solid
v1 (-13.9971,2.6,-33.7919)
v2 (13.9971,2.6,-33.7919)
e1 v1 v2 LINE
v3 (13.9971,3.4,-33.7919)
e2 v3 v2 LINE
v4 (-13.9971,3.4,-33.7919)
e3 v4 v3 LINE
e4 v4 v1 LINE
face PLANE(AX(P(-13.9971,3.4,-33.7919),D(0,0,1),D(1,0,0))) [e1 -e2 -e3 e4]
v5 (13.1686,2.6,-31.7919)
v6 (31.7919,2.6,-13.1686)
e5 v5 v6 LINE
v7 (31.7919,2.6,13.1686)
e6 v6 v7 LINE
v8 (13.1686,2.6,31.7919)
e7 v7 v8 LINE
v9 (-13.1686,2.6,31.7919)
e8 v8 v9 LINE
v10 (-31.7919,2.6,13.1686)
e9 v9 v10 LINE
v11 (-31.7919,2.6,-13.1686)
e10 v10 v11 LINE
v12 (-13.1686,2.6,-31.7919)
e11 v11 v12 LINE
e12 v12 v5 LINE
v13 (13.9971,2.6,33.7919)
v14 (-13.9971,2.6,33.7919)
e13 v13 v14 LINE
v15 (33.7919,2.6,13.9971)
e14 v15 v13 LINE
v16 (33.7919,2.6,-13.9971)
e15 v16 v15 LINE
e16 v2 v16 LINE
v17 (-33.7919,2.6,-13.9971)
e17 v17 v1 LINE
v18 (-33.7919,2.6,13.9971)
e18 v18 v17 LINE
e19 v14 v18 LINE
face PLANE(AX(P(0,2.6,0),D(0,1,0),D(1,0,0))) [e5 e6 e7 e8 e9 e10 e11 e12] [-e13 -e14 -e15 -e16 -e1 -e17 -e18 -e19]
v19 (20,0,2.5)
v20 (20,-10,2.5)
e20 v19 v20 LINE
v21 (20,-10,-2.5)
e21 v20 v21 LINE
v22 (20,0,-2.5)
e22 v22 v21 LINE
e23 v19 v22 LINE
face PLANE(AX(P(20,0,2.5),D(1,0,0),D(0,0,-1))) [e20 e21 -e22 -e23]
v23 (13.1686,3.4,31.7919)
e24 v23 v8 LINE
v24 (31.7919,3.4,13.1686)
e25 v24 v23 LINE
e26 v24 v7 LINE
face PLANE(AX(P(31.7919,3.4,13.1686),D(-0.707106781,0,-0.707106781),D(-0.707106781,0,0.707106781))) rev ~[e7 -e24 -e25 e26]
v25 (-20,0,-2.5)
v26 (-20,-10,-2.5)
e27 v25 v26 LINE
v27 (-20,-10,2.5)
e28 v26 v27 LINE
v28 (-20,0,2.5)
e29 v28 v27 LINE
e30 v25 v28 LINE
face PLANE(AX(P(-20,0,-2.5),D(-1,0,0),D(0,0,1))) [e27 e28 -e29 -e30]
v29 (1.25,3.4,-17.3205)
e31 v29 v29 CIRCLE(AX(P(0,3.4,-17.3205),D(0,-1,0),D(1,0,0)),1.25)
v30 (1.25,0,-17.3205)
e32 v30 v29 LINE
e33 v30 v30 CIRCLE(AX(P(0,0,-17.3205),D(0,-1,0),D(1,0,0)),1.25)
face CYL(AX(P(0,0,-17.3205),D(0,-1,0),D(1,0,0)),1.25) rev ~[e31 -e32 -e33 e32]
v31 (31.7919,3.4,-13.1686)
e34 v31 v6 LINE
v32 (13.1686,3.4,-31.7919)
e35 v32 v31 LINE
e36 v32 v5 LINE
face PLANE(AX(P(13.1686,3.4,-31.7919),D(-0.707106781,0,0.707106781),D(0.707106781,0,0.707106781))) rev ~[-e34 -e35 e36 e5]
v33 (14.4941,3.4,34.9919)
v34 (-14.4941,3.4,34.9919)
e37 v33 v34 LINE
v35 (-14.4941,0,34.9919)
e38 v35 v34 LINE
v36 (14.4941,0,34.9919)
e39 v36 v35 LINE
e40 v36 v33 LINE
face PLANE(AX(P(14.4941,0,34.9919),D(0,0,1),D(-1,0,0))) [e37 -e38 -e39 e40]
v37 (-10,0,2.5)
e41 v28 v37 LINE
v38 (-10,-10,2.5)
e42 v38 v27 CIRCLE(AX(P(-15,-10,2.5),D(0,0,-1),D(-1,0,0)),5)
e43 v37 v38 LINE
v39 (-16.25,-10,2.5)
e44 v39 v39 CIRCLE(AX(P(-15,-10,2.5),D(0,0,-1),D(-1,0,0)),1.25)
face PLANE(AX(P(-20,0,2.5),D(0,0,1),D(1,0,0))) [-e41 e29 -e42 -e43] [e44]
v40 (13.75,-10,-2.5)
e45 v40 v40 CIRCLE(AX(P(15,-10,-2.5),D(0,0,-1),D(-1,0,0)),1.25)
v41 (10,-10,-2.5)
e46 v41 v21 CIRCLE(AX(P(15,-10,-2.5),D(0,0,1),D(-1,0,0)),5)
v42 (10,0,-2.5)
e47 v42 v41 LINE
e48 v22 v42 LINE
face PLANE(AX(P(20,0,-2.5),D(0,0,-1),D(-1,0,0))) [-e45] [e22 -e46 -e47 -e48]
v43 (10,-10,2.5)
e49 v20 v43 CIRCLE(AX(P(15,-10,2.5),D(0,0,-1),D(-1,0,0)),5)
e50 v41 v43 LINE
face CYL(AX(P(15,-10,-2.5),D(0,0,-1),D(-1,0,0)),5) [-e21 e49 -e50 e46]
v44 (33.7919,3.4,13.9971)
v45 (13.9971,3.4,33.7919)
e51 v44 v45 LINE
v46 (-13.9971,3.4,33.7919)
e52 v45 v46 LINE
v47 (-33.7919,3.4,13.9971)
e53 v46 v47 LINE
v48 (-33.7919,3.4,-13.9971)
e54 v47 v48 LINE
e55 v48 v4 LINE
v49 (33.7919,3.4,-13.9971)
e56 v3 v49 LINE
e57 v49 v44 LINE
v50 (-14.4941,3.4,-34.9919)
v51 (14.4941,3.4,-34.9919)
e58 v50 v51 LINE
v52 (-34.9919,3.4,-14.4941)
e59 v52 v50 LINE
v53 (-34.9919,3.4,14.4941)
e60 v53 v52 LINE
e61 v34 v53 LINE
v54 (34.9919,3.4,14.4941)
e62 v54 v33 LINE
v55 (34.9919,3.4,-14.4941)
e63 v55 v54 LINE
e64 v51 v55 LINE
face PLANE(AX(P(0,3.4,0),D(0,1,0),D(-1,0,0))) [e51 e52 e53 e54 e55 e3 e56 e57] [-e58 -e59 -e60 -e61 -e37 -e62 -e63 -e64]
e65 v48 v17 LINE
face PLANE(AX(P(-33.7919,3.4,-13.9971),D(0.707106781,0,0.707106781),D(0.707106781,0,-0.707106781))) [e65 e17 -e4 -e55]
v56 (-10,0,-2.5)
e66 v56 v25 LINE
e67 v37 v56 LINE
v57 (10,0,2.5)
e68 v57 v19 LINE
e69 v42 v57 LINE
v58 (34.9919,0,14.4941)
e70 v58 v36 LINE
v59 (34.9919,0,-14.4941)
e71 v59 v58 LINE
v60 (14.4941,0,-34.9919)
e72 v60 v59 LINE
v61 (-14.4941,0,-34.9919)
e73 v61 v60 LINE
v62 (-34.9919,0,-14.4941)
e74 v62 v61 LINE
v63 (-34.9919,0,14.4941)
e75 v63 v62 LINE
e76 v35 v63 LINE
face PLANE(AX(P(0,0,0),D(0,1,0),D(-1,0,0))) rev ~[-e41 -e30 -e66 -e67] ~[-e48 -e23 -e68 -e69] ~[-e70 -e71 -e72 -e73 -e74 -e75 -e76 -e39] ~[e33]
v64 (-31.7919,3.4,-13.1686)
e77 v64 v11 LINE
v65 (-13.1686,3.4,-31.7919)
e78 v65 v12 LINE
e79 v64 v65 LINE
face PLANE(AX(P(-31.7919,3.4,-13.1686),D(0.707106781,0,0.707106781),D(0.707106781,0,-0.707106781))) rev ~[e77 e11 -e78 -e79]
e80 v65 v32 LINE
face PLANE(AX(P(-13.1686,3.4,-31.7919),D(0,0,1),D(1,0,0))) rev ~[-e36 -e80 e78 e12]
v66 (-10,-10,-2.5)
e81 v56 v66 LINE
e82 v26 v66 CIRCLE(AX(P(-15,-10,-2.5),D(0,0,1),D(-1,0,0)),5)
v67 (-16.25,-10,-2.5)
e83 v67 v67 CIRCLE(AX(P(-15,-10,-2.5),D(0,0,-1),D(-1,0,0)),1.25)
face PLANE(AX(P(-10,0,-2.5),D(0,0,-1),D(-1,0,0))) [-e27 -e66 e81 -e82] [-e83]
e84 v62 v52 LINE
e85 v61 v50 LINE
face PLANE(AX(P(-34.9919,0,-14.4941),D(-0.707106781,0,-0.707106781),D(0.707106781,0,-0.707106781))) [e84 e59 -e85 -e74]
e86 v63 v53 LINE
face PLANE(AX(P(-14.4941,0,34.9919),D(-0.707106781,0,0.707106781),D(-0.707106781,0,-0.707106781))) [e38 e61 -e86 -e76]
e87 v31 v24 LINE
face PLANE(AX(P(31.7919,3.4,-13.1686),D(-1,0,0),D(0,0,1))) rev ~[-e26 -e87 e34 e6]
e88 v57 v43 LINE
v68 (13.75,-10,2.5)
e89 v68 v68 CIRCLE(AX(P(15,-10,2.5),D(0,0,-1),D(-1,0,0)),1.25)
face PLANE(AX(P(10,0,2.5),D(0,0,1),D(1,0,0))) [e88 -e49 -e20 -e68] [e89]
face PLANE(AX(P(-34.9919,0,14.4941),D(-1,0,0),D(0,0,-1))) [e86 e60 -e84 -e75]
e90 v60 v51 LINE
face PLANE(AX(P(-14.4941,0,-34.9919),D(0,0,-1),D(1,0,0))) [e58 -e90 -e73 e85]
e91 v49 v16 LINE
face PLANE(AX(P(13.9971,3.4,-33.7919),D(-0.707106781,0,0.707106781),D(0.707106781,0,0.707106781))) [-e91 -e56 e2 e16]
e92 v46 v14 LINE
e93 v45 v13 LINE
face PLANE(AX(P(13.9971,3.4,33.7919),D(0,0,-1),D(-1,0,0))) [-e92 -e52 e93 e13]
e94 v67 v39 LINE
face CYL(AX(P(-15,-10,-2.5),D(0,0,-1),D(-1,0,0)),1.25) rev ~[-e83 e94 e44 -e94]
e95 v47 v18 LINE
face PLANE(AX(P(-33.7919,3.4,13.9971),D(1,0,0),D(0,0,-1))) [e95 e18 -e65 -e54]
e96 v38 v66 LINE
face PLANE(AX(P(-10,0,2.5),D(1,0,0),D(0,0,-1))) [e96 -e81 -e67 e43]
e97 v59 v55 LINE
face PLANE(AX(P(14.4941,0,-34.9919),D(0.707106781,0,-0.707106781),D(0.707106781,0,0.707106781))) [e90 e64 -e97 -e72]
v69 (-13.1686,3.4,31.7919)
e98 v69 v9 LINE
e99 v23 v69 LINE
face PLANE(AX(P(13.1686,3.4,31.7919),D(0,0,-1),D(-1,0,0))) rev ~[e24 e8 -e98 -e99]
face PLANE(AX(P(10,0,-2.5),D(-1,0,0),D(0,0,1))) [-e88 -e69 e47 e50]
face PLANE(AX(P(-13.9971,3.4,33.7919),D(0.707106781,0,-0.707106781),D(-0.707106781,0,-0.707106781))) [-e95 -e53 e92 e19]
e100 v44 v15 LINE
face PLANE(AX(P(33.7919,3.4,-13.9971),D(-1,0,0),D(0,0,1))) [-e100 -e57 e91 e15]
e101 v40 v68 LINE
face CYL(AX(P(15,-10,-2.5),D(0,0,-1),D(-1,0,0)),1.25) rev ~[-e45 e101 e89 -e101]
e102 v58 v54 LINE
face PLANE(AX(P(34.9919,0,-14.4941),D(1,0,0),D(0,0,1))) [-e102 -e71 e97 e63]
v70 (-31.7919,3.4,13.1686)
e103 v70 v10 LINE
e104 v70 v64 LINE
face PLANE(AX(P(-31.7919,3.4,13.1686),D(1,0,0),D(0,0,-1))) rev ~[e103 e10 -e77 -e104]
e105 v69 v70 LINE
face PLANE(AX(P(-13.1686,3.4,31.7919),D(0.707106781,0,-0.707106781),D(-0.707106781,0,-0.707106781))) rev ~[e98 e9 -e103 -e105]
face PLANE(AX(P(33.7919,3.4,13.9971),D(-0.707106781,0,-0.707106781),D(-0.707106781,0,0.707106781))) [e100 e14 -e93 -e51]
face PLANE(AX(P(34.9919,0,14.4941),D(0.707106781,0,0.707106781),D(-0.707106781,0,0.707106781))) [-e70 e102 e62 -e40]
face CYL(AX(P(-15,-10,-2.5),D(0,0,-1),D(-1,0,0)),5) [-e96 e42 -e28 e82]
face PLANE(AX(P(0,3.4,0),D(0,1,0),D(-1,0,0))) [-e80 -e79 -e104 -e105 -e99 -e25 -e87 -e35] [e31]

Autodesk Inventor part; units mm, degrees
ref_plane "YZ Plane" through (0, 0, 0) normal (1, 0, 0) x (0, 1, 0)
ref_plane "XZ Plane" through (0, 0, 0) normal (0, 1, 0) x (-1, 0, 0)
ref_plane "XY Plane" through (0, 0, 0) normal (0, 0, 1) x (1, 0, 0)
sketch "스케치3" plane through (0, 0, 0) normal (0, 1, 0) x (-1, 0, 0)
  line L0 (34.9919, -14.4941) -> (14.4941, -34.9919)
  line L1 (14.4941, -34.9919) -> (-14.4941, -34.9919)
  line L2 (-14.4941, -34.9919) -> (-34.9919, -14.4941)
  line L3 (-34.9919, -14.4941) -> (-34.9919, 14.4941)
  line L4 (-34.9919, 14.4941) -> (-14.4941, 34.9919)
  line L5 (-14.4941, 34.9919) -> (14.4941, 34.9919)
  line L6 (14.4941, 34.9919) -> (34.9919, 14.4941)
  line L7 (34.9919, 14.4941) -> (34.9919, -14.4941)
  line L8 (32.5919, -13.5) -> (13.5, -32.5919)
  line L9 (13.5, -32.5919) -> (-13.5, -32.5919)
  line L10 (-13.5, -32.5919) -> (-32.5919, -13.5)
  line L11 (-32.5919, -13.5) -> (-32.5919, 13.5)
  line L12 (-32.5919, 13.5) -> (-13.5, 32.5919)
  line L13 (-13.5, 32.5919) -> (13.5, 32.5919)
  line L14 (13.5, 32.5919) -> (32.5919, 13.5)
  line L15 (32.5919, 13.5) -> (32.5919, -13.5)
  point P0 (0, 0)
  point P1 (0, 0)
  point P2 (0, 0)
  point P3 (0, 0)
  dimension "d43" = 27
  dimension "d44" = 2.4
extrude "돌출2" add sketch "스케치3" along normal blind 3.4 contours L0 L1 L2 L3 L4 L5 L6 L7 | L8 L9 L10 L11 L12 L13 L14 L15
sketch "스케치4" plane through (0, 3.4, 0) normal (0, 1, 0) x (1, 0, 0)
  line L0 (13.5, -32.5919) -> (-13.5, -32.5919)
  line L1 (-13.5, -32.5919) -> (-32.5919, -13.5)
  line L2 (-32.5919, -13.5) -> (-32.5919, 13.5)
  line L3 (-32.5919, 13.5) -> (-13.5, 32.5919)
  line L4 (-13.5, 32.5919) -> (13.5, 32.5919)
  line L5 (13.5, 32.5919) -> (32.5919, 13.5)
  line L6 (32.5919, 13.5) -> (32.5919, -13.5)
  line L7 (32.5919, -13.5) -> (13.5, -32.5919)
  line L8 (-13.9971, 33.7919) -> (13.9971, 33.7919)
  line L9 (13.9971, 33.7919) -> (33.7919, 13.9971)
  line L10 (33.7919, 13.9971) -> (33.7919, -13.9971)
  line L11 (33.7919, -13.9971) -> (13.9971, -33.7919)
  line L12 (13.9971, -33.7919) -> (-13.9971, -33.7919)
  line L13 (-13.9971, -33.7919) -> (-33.7919, -13.9971)
  line L14 (-33.7919, -13.9971) -> (-33.7919, 13.9971)
  line L15 (-33.7919, 13.9971) -> (-13.9971, 33.7919)
  line L16 (-13.1686, 31.7919) -> (13.1686, 31.7919)
  line L17 (13.1686, 31.7919) -> (31.7919, 13.1686)
  line L18 (31.7919, 13.1686) -> (31.7919, -13.1686)
  line L19 (31.7919, -13.1686) -> (13.1686, -31.7919)
  line L20 (13.1686, -31.7919) -> (-13.1686, -31.7919)
  line L21 (-13.1686, -31.7919) -> (-31.7919, -13.1686)
  line L22 (-31.7919, -13.1686) -> (-31.7919, 13.1686)
  line L23 (-31.7919, 13.1686) -> (-13.1686, 31.7919)
  point P0 (0, 0)
  point P1 (0, 0)
  point P2 (0, 0)
  point P3 (0, 0)
  dimension "d7" = 27
  dimension "d42" = 1.2
  dimension "d45" = 0.8
extrude "돌출3" cut sketch "스케치4" against normal blind 0.8 contours L0 L1 L2 L3 L4 L5 L6 L7 | L8 L9 L10 L11 L12 L13 L14 L15
sketch "스케치5" plane through (0, 0, 0) normal (0, -1, 0) x (1, 0, 0)
  line L0 (10, 2.5) -> (20, 2.5)
  line L1 (20, 2.5) -> (20, -2.5)
  line L2 (20, -2.5) -> (10, -2.5)
  line L3 (10, -2.5) -> (10, 2.5)
  line L4 (10, 2.5) -> (20, -2.5) construction
  line L5 (20, 2.5) -> (10, -2.5) construction
  line L6 (-20, 2.5) -> (-10, 2.5)
  line L7 (-10, 2.5) -> (-10, -2.5)
  line L8 (-10, -2.5) -> (-20, -2.5)
  line L9 (-20, -2.5) -> (-20, 2.5)
  line L10 (-20, 2.5) -> (-10, -2.5) construction
  line L11 (-10, 2.5) -> (-20, -2.5) construction
  point P0 (0, 0)
  point P1 (15, 0)
  point P2 (-15, 0)
  dimension "d11" = 10
  dimension "d12" = 5
  dimension "d13" = 10
  dimension "d16" = 30
extrude "돌출4" add sketch "스케치5" along normal blind 10
sketch "스케치6" plane through (-10, 0, -2.5) normal (0, 0, -1) x (-1, 0, 0)
  circle A0 centre (5, -10) radius 5
  circle A1 centre (-25, -10) radius 5
  line L0 (-20, -10) -> (-30, -10) projected
  line L1 (10, -10) -> (0, -10) projected
  point P0 (-10, 0)
  dimension "d23" = 10
  dimension "d24" = 10
extrude "돌출5" add sketch "스케치6" against normal blind 5
sketch "스케치7" plane through (-10, 0, -2.5) normal (0, 0, -1) x (-1, 0, 0)
  circle A0 centre (5, -10) radius 1.25
  line L0 (10, 0) -> (10, -10) projected
  line L1 (0, 0) -> (10, 0) projected
  line L2 (4.7788, 0) -> (0, 0)
  circle A1 centre (-25, -10) radius 1.25
  point P0 (-10, 0)
  dimension "d27" = 2.5
  dimension "d28" = 5
  dimension "d31" = 30
extrude "돌출6" cut sketch "스케치7" against normal blind 5
sketch "스케치8" plane through (0, 0, 0) normal (0, -1, 0) x (1, 0, 0)
  circle A0 centre (0, -17.3205) radius 1.25
  line L0 (-10, 2.5) -> (-10, -2.5) projected
  point P0 (0, 0)
  point P1 (-10, 0)
  dimension "d38" = 2.5
  dimension "d39" = 17.3205
extrude "돌출7" cut sketch "스케치8" against normal blind 5
properties part number "팔각형 OV-PAM 5패턴 상단 - 틈 너비 수정"
